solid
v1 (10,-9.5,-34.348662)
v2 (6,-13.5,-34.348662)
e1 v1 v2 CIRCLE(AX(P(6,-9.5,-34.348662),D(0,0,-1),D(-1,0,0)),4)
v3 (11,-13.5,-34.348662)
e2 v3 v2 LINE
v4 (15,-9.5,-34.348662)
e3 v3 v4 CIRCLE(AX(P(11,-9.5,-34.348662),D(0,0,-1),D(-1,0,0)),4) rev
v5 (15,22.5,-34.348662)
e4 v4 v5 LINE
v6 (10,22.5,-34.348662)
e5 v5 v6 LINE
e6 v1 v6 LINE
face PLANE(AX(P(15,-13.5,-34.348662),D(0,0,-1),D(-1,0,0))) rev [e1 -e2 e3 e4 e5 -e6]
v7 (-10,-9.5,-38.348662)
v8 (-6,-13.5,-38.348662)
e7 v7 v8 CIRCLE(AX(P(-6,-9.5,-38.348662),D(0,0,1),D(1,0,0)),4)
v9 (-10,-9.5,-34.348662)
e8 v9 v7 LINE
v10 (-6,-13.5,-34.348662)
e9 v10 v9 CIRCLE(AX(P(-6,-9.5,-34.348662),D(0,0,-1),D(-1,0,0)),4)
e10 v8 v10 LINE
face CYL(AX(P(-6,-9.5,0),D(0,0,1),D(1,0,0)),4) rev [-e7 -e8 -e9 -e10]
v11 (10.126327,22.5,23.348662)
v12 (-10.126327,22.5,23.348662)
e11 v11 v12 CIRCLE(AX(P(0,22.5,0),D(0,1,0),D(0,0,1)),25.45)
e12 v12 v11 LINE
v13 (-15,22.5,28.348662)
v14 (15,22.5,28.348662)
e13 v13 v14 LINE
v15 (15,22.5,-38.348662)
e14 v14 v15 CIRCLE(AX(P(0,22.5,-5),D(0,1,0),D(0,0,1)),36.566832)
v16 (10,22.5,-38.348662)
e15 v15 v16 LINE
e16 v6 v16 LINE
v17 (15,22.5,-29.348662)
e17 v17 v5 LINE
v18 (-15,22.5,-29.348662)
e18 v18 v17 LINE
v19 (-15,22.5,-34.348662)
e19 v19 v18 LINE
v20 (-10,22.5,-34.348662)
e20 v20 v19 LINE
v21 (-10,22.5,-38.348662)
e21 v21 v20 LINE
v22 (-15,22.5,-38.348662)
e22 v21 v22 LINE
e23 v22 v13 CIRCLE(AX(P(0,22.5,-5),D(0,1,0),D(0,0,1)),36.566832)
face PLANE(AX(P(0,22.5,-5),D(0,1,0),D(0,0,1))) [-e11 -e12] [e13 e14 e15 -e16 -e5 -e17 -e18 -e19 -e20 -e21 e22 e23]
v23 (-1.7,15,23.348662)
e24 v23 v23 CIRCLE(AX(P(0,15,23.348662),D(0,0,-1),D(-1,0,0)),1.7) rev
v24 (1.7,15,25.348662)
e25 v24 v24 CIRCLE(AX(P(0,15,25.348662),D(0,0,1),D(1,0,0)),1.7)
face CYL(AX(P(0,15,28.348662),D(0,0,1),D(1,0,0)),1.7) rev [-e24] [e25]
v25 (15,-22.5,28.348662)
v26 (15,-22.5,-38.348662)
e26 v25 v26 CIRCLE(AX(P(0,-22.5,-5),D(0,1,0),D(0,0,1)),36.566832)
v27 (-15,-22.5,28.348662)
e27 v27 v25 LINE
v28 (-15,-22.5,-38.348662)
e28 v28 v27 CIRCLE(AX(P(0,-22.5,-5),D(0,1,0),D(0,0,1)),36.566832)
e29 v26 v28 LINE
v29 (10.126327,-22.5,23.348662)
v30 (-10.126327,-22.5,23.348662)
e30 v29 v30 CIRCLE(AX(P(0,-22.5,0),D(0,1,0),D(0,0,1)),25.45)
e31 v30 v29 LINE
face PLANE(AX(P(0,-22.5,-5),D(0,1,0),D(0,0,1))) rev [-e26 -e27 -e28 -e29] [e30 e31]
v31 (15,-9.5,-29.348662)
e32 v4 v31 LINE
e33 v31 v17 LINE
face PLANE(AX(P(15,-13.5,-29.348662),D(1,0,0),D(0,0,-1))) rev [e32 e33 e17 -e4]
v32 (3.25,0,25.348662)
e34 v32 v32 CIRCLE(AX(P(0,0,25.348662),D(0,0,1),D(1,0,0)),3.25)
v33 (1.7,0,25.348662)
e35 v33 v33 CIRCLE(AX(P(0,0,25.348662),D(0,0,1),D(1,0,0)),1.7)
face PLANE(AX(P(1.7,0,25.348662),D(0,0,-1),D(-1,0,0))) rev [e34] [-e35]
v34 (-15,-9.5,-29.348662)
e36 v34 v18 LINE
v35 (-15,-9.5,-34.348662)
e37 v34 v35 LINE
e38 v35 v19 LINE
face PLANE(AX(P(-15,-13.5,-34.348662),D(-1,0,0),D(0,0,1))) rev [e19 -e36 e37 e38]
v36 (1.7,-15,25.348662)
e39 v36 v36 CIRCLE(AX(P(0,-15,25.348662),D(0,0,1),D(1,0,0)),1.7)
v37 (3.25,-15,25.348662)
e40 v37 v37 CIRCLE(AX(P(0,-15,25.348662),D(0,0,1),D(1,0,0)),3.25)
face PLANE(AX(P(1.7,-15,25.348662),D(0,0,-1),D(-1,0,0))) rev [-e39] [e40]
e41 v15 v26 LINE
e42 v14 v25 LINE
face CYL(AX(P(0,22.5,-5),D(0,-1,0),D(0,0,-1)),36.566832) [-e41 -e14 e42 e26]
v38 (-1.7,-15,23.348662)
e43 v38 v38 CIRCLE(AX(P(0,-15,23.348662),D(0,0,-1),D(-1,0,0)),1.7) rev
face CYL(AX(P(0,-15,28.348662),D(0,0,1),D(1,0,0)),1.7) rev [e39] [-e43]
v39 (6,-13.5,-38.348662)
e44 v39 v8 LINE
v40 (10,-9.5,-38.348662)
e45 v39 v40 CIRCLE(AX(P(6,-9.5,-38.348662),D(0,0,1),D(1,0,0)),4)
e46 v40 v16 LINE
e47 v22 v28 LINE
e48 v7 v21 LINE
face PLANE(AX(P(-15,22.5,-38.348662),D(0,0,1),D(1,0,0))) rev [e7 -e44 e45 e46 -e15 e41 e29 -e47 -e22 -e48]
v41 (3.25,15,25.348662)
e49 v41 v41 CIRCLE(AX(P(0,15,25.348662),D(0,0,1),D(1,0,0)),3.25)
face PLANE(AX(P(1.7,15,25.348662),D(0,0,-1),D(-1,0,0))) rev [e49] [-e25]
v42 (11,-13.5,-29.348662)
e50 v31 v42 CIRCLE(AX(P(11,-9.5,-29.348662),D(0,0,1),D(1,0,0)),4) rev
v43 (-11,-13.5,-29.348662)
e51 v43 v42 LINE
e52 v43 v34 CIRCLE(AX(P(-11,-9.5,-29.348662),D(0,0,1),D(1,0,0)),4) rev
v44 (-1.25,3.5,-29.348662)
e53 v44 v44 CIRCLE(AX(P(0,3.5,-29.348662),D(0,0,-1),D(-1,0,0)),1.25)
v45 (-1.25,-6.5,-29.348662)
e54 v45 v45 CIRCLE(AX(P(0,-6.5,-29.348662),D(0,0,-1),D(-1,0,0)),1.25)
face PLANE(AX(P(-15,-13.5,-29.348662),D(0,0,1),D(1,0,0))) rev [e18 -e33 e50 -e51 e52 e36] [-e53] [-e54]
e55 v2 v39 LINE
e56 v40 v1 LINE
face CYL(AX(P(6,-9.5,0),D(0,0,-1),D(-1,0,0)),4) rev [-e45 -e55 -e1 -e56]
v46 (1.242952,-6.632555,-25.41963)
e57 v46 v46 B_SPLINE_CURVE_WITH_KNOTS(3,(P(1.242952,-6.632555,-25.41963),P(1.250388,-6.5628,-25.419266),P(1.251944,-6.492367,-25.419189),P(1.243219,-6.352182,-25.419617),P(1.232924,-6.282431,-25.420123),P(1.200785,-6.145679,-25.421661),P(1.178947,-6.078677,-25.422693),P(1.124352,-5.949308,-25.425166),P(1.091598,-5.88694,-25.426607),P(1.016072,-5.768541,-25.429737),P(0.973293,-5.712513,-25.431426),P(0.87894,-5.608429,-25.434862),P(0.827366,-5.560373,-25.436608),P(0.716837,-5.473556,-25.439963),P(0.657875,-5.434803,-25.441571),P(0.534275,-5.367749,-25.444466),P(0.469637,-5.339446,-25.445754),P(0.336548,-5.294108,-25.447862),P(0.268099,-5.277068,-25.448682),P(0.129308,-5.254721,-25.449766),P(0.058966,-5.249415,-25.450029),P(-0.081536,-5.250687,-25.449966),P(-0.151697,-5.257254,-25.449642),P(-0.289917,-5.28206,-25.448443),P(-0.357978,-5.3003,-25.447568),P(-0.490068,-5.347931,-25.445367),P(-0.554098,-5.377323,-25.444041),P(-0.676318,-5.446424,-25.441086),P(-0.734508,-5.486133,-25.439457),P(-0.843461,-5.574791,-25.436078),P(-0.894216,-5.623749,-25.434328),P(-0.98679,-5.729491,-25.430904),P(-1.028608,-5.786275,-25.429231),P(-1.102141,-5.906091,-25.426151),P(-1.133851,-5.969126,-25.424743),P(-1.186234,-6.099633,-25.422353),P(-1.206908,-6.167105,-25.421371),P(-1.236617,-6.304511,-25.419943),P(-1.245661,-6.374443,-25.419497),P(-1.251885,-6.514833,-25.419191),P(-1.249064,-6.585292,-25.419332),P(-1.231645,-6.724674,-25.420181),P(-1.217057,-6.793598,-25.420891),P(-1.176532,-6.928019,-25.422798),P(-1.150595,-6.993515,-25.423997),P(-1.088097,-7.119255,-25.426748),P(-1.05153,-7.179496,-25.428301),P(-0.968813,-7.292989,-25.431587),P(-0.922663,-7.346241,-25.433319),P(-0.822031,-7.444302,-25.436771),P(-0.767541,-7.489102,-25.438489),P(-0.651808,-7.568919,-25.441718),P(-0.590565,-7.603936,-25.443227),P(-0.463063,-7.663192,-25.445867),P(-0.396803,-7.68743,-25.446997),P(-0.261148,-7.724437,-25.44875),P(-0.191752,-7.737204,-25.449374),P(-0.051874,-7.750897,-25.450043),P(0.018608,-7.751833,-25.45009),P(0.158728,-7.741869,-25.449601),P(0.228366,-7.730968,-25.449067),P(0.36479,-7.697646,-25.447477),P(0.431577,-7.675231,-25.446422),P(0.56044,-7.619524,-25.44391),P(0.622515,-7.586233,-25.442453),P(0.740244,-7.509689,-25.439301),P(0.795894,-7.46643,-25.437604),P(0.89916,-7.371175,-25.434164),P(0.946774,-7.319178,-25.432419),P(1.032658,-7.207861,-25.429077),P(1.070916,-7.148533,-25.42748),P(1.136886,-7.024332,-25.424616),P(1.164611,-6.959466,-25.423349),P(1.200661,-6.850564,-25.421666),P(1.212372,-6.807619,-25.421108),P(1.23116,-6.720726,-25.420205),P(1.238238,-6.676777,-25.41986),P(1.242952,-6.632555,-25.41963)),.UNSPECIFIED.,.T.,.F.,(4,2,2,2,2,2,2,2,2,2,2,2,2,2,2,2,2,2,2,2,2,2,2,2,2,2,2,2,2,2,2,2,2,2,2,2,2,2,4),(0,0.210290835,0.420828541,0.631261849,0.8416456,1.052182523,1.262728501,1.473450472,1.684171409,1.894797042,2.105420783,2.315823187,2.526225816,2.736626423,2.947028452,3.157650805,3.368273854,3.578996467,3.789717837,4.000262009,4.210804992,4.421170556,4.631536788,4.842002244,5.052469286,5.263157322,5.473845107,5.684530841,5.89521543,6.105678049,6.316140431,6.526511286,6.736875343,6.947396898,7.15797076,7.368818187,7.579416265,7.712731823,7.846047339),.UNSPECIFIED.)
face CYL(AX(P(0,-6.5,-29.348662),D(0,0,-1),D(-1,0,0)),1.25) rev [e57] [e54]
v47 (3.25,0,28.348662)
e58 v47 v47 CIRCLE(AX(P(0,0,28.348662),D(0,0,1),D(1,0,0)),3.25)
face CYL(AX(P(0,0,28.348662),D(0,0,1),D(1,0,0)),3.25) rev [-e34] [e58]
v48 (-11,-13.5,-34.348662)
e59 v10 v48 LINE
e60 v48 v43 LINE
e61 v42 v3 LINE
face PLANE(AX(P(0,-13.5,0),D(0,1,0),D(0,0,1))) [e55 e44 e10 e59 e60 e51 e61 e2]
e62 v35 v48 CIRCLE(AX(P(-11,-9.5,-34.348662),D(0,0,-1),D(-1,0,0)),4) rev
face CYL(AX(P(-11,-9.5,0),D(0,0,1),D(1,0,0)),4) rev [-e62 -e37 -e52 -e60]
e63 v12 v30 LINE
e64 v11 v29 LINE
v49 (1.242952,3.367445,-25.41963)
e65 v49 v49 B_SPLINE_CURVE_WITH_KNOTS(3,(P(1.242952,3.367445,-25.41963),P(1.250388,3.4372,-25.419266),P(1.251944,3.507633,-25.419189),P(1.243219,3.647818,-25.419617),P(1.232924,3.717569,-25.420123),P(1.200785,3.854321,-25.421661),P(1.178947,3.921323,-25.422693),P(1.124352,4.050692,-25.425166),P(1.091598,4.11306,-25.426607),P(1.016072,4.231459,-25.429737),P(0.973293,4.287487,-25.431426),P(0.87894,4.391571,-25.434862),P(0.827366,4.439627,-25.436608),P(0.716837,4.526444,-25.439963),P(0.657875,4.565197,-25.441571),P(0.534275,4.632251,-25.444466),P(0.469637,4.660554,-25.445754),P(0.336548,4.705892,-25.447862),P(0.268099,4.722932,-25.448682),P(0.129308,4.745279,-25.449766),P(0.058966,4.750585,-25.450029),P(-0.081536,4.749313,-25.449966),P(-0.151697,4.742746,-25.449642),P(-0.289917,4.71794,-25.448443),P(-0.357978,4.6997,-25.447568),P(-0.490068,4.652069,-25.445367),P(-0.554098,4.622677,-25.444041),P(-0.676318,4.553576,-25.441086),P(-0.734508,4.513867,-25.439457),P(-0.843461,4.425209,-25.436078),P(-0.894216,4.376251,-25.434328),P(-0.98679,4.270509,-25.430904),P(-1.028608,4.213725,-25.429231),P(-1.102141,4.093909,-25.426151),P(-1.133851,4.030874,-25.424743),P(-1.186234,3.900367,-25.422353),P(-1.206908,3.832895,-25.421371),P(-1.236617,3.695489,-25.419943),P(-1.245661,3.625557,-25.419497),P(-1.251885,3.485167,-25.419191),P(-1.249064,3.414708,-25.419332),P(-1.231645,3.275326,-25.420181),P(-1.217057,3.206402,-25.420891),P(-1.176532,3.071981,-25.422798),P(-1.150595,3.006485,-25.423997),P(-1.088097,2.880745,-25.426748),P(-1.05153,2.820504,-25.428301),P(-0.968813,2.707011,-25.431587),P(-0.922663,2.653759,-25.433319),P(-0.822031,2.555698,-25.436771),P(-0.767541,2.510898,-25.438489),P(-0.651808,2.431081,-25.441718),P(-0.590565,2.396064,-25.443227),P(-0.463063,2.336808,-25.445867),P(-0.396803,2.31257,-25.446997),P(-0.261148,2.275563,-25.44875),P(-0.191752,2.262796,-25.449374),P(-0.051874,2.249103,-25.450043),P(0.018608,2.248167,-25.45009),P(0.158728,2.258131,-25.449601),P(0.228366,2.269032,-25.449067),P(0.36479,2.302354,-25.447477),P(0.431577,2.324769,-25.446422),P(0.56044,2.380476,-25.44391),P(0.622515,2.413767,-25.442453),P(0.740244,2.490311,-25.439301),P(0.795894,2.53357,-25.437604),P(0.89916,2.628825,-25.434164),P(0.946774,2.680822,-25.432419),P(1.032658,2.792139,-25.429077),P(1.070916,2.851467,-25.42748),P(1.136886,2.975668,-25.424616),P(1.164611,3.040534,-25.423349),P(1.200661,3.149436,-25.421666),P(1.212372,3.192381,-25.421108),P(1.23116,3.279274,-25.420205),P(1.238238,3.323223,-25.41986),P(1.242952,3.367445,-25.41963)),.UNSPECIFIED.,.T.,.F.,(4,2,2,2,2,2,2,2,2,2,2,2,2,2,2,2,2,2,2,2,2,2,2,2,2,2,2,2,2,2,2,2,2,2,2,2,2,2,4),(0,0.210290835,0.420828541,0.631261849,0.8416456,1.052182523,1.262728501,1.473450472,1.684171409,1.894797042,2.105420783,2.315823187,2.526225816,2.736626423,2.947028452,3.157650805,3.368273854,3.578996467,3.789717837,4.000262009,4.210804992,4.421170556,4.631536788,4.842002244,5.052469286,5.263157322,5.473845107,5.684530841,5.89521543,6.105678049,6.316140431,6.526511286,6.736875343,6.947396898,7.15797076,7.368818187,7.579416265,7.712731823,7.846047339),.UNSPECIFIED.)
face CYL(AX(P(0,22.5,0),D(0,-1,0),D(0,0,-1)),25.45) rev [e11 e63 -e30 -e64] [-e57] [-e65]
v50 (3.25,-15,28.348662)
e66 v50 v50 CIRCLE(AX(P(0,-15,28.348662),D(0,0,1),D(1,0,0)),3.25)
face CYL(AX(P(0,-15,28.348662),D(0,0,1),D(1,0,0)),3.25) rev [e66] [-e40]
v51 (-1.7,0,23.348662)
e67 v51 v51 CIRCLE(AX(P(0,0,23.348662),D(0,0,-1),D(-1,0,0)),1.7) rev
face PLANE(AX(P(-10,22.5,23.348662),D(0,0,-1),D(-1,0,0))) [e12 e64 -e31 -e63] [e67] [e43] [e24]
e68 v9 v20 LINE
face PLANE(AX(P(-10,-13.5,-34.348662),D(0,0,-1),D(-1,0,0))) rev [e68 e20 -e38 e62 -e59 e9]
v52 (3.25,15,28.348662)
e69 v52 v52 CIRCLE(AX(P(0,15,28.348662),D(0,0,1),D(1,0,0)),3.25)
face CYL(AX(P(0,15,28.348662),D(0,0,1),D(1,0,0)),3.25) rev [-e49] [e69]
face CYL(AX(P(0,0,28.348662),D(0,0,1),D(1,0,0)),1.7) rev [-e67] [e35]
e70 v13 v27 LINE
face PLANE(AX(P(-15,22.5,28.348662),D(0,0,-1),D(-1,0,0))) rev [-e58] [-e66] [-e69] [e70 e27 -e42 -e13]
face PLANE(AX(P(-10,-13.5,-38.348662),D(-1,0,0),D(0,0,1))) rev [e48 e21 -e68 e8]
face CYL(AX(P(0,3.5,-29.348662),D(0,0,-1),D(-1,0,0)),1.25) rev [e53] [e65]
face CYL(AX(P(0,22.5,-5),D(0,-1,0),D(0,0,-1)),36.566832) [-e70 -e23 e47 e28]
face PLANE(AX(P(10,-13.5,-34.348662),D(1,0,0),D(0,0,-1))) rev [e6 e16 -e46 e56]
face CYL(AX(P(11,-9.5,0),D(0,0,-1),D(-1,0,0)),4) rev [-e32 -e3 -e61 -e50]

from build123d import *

# Parameters (mm, degrees)
BOSS_EXTRUDE1_DEPTH            = 22.5
CUT_EXTRUDE1_DEPTH             = 36
CBORE_FOR_M3_SHCS1_D           = 3.4
CBORE_FOR_M3_SHCS1_DEPTH       = 5
CBORE_FOR_M3_SHCS1_CBORE_D     = 6.5
CBORE_FOR_M3_SHCS1_CBORE_DEPTH = 3
CBORE_FOR_M3_SHCS1_TIP         = 1.021463052
M3X0_5_TAPPED_HOLE1_D          = 2.5
M3X0_5_TAPPED_HOLE1_DEPTH      = 27.571916674
M3X0_5_TAPPED_HOLE1_TIP        = 0.751075774
FILLET2_R                      = 4
TOLERANCING_START              = -22.5
TOLERANCING_DEPTH              = 45


# Read off the part's stored shape, not the designer's step: Tolerancing
with BuildPart() as part:
    # Sketch1 → Boss-Extrude1 (new, symmetric)
    with BuildSketch(Plane(origin=(0, 0, 0), x_dir=(1, 0, 0), z_dir=(0, 1, 0))):
        with BuildLine():
            Line((-15, -28.348661632), (15, -28.348661632))
            ThreePointArc((15, -28.348661632), (36.566832412, 5), (15, 38.348661632))
            Line((15, 38.348661632), (-15, 38.348661632))
            ThreePointArc((-15, 38.348661632), (-36.566832412, 5), (-15, -28.348661632))
        make_face()
        with BuildLine():
            Line((-10, -23.348661632), (10, -23.348661632))
            ThreePointArc((10, -23.348661632), (0, 25.4), (-10, -23.348661632))
        make_face(mode=Mode.SUBTRACT)
    extrude(amount=BOSS_EXTRUDE1_DEPTH, both=True)

    # Sketch4 → Cut-Extrude1 (cut)
    with BuildSketch(Plane(origin=(0, 22.5, 0), x_dir=(1, 0, 0), z_dir=(0, 1, 0))):
        Polygon((-10, 38.348661632), (-10, 34.348661632), (-15, 34.348661632), (-15, 29.348661632), (15, 29.348661632), (15, 34.348661632), (10, 34.348661632), (10, 38.348661632), align=None)
    extrude(amount=-CUT_EXTRUDE1_DEPTH, mode=Mode.SUBTRACT)

    # CBORE for M3 SHCS1
    with Locations(Plane.XY.offset(28.348661632)):
        with Locations((0, 0), (0, 15), (0, -15)):
            CounterBoreHole(CBORE_FOR_M3_SHCS1_D / 2, CBORE_FOR_M3_SHCS1_CBORE_D / 2, CBORE_FOR_M3_SHCS1_CBORE_DEPTH, depth=CBORE_FOR_M3_SHCS1_DEPTH)
            with Locations((0, 0, -(CBORE_FOR_M3_SHCS1_DEPTH + CBORE_FOR_M3_SHCS1_TIP / 2))):  # 118° drill point
                Cone(0, CBORE_FOR_M3_SHCS1_D / 2, CBORE_FOR_M3_SHCS1_TIP, mode=Mode.SUBTRACT)

    # M3x0.5 Tapped Hole1
    with Locations(Plane(origin=(0, 0, -29.348661632), x_dir=(-1, 0, 0), z_dir=(0, 0, -1))):
        with Locations((0, 3.5), (0, -6.5)):
            Hole(M3X0_5_TAPPED_HOLE1_D / 2, depth=M3X0_5_TAPPED_HOLE1_DEPTH)
            with Locations((0, 0, -(M3X0_5_TAPPED_HOLE1_DEPTH + M3X0_5_TAPPED_HOLE1_TIP / 2))):  # 118° drill point
                Cone(0, M3X0_5_TAPPED_HOLE1_D / 2, M3X0_5_TAPPED_HOLE1_TIP, mode=Mode.SUBTRACT)

    # Fillet2
    fillet2_edges = [part.edges().sort_by_distance(p)[0] for p in [
        (10, -13.5, -36.348661632),
        (15, -13.5, -31.848661632),
        (-15, -13.5, -31.848661632),
        (-10, -13.5, -36.348661632),
    ]]
    fillet(fillet2_edges, radius=FILLET2_R)

    # Tolerancing outline → Tolerancing (cut)
    with BuildSketch(Plane(origin=(0, 0, 0), x_dir=(1, 0, 0), z_dir=(0, 1, 0)).offset(TOLERANCING_START)):
        with BuildLine():
            ThreePointArc((10.126327074, -23.348661632), (0, 25.45), (-10.126327074, -23.348661632))
            Line((-10.126327074, -23.348661632), (-10, -23.348661632))
            ThreePointArc((-10, -23.348661632), (0, 25.4), (10, -23.348661632))
            Line((10, -23.348661632), (10.126327074, -23.348661632))
        make_face()
    extrude(amount=TOLERANCING_DEPTH, mode=Mode.SUBTRACT)


solid = part.part
